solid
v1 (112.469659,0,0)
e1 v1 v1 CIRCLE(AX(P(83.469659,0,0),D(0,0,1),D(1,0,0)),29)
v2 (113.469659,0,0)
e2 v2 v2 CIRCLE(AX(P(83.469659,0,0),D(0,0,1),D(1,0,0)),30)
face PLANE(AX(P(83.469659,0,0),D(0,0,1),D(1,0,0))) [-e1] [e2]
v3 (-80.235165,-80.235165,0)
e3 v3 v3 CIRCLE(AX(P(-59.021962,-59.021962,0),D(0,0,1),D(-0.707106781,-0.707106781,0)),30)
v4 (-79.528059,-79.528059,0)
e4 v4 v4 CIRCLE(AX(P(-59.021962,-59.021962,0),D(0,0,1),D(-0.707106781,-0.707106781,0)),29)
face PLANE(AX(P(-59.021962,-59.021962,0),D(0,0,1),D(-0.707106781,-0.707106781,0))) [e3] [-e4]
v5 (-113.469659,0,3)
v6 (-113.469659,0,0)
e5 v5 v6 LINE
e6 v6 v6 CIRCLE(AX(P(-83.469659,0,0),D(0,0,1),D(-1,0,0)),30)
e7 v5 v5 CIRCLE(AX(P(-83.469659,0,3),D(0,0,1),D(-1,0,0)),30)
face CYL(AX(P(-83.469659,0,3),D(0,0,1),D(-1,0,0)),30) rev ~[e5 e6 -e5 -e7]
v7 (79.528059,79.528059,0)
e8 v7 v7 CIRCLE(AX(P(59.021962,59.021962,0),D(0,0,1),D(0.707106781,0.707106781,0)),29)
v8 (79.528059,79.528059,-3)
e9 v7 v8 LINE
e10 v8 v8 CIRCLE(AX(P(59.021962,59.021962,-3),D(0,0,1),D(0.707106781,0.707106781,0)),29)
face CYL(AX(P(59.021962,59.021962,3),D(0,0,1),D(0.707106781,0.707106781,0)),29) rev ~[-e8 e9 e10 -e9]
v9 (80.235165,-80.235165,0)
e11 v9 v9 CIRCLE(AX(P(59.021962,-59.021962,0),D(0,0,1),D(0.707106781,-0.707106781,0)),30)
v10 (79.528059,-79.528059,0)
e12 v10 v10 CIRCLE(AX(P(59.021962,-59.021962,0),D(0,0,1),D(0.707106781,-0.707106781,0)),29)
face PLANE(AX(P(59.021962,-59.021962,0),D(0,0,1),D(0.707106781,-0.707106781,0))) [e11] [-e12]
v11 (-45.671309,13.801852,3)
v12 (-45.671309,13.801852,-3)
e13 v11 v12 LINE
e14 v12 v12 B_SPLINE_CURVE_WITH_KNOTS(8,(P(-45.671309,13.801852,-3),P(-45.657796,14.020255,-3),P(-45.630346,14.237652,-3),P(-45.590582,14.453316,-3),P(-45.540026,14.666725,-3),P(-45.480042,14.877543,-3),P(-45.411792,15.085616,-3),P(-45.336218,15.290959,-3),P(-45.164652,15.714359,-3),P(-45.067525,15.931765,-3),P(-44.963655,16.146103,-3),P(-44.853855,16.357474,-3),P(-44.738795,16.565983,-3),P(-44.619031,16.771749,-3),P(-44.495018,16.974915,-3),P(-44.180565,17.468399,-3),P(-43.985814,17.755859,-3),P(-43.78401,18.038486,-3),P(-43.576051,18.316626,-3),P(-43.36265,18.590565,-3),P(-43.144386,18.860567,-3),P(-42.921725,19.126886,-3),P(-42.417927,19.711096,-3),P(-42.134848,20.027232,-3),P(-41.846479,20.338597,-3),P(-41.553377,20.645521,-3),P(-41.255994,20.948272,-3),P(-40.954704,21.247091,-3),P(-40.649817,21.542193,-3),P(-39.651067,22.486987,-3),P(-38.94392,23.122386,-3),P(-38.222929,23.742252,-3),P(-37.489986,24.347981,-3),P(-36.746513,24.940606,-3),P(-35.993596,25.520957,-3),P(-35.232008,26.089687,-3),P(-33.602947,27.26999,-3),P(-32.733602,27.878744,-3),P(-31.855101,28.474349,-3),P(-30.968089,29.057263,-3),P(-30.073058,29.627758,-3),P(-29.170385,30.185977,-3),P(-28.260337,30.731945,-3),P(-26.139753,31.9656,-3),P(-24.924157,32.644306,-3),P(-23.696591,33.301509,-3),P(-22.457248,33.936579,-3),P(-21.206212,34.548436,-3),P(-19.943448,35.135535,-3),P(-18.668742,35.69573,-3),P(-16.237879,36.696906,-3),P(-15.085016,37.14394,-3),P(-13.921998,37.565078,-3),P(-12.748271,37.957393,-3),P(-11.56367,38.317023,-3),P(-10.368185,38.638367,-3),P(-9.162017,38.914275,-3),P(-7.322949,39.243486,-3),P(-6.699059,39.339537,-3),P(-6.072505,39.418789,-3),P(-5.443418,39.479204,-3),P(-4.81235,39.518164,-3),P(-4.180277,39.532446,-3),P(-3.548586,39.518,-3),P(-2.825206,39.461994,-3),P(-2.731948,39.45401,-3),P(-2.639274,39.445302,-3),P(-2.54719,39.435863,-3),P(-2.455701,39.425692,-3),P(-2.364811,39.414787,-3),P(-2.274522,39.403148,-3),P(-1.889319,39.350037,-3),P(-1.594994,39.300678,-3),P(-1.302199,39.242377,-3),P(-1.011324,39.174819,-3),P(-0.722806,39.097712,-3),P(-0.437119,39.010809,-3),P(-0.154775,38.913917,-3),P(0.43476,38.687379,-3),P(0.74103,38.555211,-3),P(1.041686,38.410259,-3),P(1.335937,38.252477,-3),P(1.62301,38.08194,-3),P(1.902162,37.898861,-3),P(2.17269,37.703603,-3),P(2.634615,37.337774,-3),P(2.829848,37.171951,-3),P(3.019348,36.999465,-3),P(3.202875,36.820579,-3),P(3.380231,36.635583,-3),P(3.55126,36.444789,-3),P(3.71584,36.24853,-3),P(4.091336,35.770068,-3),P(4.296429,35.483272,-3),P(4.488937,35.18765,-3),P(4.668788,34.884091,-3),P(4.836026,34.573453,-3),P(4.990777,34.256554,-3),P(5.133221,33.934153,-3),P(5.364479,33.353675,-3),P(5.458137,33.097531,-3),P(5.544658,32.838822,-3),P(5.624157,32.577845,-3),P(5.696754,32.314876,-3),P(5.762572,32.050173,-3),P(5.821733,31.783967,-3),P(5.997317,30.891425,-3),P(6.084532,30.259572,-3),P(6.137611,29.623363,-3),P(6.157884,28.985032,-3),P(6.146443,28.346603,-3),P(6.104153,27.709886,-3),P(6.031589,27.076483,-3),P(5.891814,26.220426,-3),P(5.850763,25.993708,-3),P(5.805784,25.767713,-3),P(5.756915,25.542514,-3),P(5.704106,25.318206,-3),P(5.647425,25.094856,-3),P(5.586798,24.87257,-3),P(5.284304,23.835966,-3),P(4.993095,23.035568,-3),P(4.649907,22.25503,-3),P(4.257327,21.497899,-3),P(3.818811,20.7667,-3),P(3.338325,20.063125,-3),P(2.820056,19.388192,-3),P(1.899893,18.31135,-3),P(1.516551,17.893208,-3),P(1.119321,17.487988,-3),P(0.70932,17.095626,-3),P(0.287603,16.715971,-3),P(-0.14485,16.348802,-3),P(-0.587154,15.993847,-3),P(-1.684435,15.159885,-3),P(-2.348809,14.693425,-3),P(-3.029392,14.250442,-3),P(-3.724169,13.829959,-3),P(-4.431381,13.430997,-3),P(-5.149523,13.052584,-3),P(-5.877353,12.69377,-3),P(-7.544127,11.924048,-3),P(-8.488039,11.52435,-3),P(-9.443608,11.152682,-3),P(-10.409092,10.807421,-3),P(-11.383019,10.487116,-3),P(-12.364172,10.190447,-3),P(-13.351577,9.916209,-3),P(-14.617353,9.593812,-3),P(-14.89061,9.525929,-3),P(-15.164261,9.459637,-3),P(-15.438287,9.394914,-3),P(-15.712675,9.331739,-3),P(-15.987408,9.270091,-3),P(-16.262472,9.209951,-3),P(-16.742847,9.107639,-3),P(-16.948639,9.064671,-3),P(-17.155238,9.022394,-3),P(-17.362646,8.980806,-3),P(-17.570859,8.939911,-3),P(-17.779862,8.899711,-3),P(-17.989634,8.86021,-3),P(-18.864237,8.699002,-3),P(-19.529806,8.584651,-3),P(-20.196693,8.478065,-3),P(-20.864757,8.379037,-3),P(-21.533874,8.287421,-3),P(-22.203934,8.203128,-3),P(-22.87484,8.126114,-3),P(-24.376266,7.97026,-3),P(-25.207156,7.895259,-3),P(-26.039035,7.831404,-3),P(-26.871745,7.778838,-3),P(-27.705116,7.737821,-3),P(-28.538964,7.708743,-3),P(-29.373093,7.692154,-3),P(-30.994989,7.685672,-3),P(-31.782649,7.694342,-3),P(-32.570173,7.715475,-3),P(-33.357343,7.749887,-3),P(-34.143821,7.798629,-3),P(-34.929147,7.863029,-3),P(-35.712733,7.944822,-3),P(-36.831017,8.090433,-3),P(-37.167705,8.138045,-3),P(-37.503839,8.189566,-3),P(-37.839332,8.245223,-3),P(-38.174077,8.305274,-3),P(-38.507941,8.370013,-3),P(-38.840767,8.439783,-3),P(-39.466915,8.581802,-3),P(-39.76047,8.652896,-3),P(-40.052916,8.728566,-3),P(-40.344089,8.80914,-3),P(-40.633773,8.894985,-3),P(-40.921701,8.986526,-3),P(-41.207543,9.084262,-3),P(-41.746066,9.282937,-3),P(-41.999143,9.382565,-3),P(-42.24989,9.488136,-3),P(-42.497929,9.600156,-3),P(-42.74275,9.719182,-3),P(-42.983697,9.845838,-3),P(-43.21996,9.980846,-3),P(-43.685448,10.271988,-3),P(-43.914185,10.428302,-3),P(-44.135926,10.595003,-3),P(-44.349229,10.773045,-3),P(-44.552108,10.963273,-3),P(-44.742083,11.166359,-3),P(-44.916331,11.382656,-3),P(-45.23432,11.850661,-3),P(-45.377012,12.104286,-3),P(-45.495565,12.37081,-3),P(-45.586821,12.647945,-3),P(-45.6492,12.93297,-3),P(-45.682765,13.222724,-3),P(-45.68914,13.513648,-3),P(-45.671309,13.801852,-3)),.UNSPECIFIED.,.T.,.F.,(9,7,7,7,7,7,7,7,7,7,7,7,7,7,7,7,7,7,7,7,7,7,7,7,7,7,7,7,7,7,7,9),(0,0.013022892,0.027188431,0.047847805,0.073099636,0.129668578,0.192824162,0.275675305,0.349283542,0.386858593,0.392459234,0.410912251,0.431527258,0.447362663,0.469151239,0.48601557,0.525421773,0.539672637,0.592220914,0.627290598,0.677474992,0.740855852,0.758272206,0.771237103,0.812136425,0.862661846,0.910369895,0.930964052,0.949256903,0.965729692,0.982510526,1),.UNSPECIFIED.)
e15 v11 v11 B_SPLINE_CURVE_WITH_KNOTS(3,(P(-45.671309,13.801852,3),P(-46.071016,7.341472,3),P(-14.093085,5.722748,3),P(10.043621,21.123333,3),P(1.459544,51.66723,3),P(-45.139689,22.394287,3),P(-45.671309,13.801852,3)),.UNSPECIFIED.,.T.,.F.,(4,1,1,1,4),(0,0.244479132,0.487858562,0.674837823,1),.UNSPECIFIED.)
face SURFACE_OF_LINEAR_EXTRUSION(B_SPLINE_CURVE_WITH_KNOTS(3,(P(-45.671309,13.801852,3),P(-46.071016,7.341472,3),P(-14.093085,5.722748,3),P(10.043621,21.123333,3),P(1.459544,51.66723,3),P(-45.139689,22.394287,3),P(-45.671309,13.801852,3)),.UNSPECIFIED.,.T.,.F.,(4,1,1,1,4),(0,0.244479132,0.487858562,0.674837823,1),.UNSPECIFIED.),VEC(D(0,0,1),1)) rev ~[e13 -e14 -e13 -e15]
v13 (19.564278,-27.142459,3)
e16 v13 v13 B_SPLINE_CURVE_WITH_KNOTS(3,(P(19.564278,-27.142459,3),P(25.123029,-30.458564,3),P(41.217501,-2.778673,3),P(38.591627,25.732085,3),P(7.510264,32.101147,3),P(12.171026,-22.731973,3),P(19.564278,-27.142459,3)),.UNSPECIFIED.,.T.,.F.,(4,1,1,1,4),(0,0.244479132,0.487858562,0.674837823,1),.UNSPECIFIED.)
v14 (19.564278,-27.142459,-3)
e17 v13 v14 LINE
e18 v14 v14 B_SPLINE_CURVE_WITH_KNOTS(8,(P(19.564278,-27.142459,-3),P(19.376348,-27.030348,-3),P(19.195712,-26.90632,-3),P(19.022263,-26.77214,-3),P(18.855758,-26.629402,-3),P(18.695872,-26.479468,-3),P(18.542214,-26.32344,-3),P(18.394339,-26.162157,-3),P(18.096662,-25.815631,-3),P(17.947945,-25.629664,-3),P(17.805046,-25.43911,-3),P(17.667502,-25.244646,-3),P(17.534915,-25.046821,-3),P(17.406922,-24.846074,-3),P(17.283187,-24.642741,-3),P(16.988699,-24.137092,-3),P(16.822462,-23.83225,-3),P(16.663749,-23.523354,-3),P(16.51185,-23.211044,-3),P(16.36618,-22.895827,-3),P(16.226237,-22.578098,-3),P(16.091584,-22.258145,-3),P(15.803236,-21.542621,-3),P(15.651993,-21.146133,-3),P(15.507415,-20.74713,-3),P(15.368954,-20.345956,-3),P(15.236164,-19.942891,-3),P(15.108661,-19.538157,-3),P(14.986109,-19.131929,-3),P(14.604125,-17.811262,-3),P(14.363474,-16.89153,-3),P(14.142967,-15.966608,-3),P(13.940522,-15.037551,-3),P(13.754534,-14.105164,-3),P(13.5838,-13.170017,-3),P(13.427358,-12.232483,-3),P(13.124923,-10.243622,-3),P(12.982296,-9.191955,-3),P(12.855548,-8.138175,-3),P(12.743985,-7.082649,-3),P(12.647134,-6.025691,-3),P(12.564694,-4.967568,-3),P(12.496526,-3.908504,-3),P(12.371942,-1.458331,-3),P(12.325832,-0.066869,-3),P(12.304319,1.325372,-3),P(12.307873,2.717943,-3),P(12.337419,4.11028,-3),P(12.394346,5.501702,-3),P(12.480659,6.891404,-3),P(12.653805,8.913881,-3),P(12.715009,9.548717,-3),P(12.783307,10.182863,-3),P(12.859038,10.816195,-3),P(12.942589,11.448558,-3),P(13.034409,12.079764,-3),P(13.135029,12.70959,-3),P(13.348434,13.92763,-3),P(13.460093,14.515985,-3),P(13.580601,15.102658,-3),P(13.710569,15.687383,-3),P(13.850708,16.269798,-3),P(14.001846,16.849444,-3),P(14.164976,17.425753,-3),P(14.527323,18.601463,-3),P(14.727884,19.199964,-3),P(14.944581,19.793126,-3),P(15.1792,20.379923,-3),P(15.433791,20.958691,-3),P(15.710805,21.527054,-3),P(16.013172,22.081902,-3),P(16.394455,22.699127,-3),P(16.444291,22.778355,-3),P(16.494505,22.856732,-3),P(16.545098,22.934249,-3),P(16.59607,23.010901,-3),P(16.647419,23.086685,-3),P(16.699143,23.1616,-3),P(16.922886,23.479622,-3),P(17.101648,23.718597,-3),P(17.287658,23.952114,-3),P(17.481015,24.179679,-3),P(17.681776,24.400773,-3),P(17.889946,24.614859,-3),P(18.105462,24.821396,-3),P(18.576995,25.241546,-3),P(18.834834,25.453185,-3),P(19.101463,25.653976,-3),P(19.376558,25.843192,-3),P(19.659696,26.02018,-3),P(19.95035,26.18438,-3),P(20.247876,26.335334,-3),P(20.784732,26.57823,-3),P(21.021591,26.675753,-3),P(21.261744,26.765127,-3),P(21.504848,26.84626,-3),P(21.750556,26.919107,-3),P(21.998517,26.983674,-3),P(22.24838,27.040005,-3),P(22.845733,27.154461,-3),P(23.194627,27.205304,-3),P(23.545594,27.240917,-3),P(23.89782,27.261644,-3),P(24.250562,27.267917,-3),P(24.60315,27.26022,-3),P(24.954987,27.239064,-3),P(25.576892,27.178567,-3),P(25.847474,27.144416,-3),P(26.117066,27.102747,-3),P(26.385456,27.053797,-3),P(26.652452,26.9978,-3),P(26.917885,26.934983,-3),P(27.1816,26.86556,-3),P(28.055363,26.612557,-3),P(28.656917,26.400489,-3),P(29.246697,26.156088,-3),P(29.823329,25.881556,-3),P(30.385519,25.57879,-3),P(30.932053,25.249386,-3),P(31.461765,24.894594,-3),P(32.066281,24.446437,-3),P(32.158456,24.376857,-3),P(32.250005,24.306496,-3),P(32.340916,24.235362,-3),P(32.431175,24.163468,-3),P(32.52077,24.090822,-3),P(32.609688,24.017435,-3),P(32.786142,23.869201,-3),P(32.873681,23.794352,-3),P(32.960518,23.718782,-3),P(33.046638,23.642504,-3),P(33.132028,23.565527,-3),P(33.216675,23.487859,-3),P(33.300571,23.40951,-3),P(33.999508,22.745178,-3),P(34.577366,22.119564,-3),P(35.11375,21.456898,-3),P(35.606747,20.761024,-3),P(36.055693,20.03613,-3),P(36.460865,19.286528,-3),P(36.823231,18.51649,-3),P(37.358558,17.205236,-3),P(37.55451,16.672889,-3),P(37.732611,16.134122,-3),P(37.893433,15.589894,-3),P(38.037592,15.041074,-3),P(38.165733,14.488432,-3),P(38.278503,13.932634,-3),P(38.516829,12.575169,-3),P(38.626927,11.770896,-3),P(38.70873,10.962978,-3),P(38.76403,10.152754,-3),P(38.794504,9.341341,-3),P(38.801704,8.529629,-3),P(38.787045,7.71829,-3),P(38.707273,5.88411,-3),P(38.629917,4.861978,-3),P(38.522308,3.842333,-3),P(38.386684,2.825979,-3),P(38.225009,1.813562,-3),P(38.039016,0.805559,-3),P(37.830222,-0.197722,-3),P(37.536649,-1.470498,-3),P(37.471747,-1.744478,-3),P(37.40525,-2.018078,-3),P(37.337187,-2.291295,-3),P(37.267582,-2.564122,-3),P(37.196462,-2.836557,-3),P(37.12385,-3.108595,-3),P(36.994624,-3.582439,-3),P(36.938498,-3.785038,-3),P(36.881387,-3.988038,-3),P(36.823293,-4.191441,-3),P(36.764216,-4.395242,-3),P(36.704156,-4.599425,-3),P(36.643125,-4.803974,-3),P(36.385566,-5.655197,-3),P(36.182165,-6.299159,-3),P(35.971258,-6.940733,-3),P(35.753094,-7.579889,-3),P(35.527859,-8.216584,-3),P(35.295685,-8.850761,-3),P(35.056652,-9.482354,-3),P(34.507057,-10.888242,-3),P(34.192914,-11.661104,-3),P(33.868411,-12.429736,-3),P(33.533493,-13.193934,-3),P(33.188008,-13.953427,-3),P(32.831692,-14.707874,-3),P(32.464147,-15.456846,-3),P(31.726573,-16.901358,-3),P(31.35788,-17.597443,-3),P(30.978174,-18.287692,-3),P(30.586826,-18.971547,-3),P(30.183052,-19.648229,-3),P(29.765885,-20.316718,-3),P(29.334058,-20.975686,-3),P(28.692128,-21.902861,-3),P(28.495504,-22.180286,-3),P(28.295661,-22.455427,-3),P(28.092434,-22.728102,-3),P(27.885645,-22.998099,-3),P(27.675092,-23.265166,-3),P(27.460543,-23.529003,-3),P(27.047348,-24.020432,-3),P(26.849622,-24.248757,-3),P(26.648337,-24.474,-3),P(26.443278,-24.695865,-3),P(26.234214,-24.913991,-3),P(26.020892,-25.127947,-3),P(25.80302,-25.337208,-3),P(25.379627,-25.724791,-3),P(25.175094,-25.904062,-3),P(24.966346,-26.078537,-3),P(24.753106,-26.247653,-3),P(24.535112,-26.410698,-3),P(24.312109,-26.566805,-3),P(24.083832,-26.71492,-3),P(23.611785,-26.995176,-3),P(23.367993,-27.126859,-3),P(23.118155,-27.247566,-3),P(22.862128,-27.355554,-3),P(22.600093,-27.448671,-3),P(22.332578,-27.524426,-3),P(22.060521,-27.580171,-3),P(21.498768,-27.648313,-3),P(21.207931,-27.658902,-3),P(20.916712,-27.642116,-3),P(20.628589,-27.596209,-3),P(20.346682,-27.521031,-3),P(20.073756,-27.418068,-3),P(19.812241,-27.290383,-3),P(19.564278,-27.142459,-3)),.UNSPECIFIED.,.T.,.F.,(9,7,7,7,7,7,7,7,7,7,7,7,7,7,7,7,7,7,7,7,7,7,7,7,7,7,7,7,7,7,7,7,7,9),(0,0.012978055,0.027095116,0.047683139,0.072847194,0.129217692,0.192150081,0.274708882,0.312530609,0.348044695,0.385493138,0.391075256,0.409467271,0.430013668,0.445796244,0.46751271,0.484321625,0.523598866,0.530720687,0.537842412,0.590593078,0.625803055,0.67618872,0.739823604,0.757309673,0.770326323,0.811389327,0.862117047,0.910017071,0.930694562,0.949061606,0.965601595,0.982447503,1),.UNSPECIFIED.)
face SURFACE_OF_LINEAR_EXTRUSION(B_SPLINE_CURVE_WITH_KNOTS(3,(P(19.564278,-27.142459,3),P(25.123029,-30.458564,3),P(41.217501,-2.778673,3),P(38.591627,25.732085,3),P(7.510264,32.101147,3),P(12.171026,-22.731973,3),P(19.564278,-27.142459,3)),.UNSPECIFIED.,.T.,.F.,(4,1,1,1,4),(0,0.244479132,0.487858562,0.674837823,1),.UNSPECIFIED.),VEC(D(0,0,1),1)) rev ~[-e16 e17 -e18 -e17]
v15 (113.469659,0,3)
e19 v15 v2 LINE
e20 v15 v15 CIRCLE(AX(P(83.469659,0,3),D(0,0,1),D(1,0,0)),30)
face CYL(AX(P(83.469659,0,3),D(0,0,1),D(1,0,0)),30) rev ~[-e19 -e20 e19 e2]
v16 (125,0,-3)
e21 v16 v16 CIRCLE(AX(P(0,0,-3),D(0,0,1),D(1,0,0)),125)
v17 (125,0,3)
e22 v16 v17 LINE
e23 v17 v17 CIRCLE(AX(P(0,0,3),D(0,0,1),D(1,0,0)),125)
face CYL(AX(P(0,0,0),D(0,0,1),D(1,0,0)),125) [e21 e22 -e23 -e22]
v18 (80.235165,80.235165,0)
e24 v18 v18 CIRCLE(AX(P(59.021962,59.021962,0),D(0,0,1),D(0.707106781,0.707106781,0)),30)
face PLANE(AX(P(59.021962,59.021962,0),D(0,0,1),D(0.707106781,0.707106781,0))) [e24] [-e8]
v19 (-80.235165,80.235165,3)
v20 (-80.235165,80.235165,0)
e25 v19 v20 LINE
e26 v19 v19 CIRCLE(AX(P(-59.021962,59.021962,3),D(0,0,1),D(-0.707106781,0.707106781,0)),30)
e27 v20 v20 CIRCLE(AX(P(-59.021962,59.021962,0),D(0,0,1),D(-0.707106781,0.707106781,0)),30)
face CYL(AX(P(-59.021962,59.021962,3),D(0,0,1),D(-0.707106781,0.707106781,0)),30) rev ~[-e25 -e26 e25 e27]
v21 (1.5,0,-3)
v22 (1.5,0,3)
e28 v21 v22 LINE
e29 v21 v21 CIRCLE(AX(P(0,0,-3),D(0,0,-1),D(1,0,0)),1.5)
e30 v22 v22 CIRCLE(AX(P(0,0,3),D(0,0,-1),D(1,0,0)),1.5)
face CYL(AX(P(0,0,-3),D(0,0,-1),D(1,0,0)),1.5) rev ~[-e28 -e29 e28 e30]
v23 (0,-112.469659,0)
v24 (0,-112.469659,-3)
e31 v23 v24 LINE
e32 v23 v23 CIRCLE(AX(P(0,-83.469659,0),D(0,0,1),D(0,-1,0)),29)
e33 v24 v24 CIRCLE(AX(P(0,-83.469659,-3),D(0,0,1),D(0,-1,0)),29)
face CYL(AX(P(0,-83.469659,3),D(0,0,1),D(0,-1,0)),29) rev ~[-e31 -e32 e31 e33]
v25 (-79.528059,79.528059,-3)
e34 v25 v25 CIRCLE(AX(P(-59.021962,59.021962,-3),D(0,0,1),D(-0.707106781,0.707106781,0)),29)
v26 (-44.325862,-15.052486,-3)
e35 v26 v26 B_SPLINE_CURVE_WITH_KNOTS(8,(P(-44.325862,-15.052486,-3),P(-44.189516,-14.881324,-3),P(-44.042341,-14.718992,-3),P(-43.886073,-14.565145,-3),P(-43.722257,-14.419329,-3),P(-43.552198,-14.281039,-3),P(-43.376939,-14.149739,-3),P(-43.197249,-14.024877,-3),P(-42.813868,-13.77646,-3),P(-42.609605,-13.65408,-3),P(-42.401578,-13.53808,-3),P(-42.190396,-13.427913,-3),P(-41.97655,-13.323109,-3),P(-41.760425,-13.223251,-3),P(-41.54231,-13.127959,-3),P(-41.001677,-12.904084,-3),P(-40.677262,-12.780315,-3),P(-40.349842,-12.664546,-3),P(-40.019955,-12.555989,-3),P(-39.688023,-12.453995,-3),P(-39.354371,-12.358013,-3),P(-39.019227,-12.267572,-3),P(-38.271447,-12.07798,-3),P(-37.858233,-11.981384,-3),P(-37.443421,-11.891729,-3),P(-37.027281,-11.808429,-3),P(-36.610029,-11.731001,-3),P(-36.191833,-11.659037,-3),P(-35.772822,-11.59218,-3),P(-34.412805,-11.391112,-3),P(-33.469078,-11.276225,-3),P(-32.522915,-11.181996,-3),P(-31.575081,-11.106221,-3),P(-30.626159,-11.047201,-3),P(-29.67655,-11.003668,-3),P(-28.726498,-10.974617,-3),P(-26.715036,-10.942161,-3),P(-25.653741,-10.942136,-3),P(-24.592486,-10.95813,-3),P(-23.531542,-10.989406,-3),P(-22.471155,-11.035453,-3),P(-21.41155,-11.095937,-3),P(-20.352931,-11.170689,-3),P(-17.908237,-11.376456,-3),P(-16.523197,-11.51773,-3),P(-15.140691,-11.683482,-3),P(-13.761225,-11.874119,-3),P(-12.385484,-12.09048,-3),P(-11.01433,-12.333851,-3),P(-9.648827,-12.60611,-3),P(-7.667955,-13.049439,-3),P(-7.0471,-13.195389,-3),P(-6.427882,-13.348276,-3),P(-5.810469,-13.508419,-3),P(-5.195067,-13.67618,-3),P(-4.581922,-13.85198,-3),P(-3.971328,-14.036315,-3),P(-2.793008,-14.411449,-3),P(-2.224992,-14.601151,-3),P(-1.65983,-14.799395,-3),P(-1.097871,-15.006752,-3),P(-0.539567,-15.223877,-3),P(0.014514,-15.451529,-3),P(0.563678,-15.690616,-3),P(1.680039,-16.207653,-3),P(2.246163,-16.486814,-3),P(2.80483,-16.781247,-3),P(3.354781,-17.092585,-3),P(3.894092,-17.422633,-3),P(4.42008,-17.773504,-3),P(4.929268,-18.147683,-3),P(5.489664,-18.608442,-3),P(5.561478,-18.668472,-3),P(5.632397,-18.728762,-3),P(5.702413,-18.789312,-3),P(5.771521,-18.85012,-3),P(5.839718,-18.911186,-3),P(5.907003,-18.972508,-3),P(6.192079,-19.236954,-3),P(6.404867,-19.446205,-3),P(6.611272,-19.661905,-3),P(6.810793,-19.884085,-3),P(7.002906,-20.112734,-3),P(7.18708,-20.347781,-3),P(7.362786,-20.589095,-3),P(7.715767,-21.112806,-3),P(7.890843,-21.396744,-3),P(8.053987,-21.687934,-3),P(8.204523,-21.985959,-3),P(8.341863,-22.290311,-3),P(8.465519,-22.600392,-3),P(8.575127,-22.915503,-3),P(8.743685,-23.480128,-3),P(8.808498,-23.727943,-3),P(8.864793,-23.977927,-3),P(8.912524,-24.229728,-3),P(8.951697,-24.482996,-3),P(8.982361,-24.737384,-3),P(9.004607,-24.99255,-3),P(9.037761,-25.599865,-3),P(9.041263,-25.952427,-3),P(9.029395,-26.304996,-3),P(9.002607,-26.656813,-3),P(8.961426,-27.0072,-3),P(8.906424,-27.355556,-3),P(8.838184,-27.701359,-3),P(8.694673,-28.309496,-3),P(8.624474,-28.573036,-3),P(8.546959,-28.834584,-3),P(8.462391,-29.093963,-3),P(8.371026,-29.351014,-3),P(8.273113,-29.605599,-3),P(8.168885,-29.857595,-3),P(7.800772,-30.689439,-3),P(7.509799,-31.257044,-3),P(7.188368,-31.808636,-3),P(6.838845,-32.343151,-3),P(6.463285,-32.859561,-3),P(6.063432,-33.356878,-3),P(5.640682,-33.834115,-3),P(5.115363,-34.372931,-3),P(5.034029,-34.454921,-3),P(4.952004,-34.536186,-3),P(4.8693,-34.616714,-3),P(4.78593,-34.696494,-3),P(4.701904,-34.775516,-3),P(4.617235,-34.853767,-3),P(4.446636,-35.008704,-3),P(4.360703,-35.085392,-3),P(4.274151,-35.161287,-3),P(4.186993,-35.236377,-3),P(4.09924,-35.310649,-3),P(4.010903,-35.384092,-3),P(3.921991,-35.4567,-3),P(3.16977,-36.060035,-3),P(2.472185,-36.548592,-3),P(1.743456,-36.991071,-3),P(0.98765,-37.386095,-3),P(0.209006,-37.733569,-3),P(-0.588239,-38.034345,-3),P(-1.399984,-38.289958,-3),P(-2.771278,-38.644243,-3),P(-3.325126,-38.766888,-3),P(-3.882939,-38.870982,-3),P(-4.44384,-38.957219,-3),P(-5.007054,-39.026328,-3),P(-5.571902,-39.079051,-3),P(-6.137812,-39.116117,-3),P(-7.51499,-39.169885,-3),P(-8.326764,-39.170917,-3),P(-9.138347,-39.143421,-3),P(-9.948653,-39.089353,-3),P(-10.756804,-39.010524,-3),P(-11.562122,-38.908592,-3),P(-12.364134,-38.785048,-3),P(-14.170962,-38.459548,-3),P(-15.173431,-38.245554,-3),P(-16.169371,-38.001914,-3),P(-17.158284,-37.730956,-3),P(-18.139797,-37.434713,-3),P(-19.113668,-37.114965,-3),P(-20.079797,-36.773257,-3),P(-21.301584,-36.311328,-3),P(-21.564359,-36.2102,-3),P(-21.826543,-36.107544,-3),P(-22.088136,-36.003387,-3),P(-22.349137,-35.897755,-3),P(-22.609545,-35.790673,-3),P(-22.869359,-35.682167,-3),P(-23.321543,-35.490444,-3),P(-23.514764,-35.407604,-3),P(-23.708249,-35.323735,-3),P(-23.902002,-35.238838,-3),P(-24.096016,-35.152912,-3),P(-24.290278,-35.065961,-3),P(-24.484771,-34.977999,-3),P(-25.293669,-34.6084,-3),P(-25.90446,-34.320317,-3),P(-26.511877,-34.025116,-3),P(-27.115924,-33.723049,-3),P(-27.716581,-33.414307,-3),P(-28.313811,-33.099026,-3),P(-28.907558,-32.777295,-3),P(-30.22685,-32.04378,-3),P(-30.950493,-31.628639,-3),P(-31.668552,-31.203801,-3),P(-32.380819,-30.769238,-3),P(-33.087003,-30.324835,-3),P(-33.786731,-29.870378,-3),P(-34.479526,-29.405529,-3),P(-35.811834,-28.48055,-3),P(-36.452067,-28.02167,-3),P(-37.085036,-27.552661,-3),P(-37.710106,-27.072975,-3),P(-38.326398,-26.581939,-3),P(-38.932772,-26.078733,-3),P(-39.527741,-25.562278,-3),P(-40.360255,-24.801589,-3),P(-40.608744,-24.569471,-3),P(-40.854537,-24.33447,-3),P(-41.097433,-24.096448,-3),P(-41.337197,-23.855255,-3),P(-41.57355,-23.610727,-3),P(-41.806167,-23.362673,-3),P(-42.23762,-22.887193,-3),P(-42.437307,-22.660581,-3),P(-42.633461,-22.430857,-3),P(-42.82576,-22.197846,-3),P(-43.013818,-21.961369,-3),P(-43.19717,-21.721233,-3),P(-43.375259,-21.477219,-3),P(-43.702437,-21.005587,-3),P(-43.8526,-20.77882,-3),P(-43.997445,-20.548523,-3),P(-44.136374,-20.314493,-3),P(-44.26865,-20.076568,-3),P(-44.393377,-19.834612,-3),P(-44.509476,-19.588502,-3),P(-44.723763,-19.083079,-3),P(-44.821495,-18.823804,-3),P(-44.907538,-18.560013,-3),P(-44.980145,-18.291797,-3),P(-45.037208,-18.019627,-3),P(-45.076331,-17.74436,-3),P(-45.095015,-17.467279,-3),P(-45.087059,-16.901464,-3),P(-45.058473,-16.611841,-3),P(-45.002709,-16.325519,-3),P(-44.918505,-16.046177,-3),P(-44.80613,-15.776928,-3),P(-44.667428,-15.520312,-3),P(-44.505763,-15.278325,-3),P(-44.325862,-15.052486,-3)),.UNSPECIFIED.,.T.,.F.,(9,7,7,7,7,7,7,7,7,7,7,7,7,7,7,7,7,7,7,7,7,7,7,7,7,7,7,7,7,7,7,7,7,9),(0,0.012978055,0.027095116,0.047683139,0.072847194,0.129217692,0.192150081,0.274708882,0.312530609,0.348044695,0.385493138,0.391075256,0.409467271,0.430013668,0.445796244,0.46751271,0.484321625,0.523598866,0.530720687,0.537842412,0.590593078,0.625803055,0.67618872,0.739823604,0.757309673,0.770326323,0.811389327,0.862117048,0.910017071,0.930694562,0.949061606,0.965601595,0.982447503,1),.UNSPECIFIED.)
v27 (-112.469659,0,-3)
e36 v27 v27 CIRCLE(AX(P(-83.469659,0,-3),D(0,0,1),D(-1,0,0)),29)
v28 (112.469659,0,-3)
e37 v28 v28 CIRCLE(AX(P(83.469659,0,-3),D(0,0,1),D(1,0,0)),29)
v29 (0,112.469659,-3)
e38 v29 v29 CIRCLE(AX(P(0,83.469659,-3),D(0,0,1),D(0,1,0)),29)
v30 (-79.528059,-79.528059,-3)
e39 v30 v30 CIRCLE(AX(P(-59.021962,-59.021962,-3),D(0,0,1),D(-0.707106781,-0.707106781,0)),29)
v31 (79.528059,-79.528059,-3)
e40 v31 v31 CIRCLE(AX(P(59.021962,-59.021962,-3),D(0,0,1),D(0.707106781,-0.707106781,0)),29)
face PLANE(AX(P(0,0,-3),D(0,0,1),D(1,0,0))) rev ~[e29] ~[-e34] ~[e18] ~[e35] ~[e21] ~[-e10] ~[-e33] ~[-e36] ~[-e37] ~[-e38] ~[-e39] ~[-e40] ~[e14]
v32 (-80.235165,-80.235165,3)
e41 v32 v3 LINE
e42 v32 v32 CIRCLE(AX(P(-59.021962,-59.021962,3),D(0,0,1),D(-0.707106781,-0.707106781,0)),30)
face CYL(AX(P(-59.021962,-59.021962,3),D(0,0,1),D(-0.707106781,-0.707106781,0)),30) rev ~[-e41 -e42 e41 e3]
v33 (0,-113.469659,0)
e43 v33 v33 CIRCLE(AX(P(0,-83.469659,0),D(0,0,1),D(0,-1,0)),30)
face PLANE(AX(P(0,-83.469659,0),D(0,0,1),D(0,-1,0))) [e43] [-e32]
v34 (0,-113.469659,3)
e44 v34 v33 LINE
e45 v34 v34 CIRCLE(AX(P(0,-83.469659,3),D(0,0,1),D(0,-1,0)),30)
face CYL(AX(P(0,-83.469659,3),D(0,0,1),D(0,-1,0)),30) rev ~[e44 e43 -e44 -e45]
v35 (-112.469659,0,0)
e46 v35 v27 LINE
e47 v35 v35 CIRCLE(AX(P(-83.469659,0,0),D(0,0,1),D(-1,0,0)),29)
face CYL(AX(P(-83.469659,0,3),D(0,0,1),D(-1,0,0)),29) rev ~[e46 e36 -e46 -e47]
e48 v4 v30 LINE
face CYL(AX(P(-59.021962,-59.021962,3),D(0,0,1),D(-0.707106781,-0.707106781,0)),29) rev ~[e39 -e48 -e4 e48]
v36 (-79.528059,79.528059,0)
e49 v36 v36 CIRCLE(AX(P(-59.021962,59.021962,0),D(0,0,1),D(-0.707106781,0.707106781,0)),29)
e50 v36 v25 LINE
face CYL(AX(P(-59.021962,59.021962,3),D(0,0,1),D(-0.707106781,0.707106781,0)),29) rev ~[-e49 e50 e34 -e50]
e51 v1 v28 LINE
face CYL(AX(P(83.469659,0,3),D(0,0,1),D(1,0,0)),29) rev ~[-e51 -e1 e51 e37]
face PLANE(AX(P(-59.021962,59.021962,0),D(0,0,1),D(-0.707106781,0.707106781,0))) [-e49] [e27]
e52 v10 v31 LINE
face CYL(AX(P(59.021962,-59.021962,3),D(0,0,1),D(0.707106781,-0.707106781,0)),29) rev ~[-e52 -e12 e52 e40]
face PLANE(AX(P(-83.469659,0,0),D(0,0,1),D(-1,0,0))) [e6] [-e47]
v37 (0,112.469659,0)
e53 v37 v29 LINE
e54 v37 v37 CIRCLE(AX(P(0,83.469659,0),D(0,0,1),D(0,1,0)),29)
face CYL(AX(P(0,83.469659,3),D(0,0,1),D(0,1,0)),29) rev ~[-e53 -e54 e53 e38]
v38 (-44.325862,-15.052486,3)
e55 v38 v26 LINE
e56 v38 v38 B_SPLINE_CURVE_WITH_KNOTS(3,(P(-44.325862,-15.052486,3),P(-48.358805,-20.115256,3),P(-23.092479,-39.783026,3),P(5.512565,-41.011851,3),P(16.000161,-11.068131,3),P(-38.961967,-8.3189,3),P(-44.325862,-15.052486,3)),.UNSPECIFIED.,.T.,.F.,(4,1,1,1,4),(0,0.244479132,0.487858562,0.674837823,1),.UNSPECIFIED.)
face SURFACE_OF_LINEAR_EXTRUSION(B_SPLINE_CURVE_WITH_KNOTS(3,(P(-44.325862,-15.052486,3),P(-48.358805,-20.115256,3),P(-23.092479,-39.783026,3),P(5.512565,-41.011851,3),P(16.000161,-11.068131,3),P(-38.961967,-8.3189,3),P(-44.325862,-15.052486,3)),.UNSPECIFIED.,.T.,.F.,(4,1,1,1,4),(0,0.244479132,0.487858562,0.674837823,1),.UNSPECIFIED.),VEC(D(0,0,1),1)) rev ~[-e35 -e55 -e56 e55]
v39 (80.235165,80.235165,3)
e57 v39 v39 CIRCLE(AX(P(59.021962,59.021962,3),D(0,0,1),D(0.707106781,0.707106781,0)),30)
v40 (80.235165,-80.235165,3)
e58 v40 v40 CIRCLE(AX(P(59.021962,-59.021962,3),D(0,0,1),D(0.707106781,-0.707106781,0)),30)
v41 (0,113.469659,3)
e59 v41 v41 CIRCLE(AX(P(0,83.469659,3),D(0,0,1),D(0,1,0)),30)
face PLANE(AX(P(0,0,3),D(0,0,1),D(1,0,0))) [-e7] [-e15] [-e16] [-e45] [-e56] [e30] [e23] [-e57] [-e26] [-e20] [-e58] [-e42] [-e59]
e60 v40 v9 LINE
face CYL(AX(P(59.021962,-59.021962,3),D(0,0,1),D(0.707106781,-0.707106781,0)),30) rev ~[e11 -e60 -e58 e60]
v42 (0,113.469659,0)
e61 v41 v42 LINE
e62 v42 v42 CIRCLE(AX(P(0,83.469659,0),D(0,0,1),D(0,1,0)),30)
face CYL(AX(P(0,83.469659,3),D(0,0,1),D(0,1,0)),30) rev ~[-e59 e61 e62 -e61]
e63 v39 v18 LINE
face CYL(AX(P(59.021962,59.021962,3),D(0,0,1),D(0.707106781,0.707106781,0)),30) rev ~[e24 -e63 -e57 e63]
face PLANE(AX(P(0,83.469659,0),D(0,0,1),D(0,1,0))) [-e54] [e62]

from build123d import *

# Parameters (mm, degrees)
F0_R            = 125
F1_DEPTH        = 3
F2_R            = 1.5
F3_DEPTH        = 6.001
F5_R            = 29
F6_DEPTH        = 6.001
F6_COPIES_COUNT = 8
F5_R_2          = 30
F7_DEPTH        = 3
F7_COPIES_COUNT = 8
F9_DEPTH        = 6.001


# Not quite as in the source:
# - a pattern or mirror of a feature is missing from the dataset's text; its kind, count and spacing are read off the source's solid


with BuildPart() as f1:
    # F0 (on Top) → F1 (new body, symmetric)
    with BuildSketch(Plane.XY):
        Circle(F0_R)
    extrude(amount=F1_DEPTH, both=True)

    # F2 (on face) → F3 (cut, through all)
    with BuildSketch(Plane(origin=(0, 0, -3), x_dir=(1, 0, 0), z_dir=(0, 0, -1))):
        Circle(F2_R)
    extrude(amount=-F3_DEPTH, mode=Mode.SUBTRACT)

    # F5 (on face) → F6 (cut, through all)
    with BuildSketch(Plane.XY.offset(3)):
        with Locations((83.46965909, 0)):
            Circle(F5_R)
    f6 = extrude(amount=-F6_DEPTH, mode=Mode.SUBTRACT)

    # F6_copies: F6 ×8 about axis
    f6_copies_axis = Axis((0, 0, 0), (0, 0, 1))
    for i in range(1, F6_COPIES_COUNT):
        add(f6.rotate(f6_copies_axis, i * 360 / F6_COPIES_COUNT), mode=Mode.SUBTRACT)

    # F5 (on face) → F7 (cut)
    with BuildSketch(Plane.XY.offset(3)):
        with Locations((83.46965909, 0)):
            Circle(F5_R_2)
        with Locations((83.46965909, 0)):
            Circle(F5_R, mode=Mode.SUBTRACT)
    f7 = extrude(amount=-F7_DEPTH, mode=Mode.SUBTRACT)

    # F7_copies: F7 ×8 about axis
    f7_copies_axis = Axis((0, 0, 0), (0, 0, 1))
    for i in range(1, F7_COPIES_COUNT):
        add(f7.rotate(f7_copies_axis, i * 360 / F7_COPIES_COUNT), mode=Mode.SUBTRACT)

    # F8 (on face) → F9 (cut, through all)
    with BuildSketch(Plane.XY.offset(3)):
        with BuildLine():
            add(Edge.make_bspline(
                [(-44.3258620799, -15.0524862111), (-48.3588050122, -20.1152564211), (-23.0924792953, -39.7830257512), (5.512565217, -41.0118510348), (16.0001607542, -11.0681310793), (-38.9619666275, -8.3188997057), (-44.3258620799, -15.0524862111)],
                knots=[0, 0, 0, 0, 0.2444791319, 0.4878585615, 0.6748378229, 1, 1, 1, 1], degree=3))
        make_face()
        with BuildLine():
            add(Edge.make_bspline(
                [(-45.671308504, 13.8018518265), (-46.0710162563, 7.3414722241), (-14.0930848504, 5.7227478351), (10.0436210659, 21.123332585), (1.4595442067, 51.6672296743), (-45.1396891305, 22.3942870163), (-45.671308504, 13.8018518265)],
                knots=[0, 0, 0, 0, 0.2444791319, 0.4878585615, 0.6748378229, 1, 1, 1, 1], degree=3))
        make_face()
        with BuildLine():
            add(Edge.make_bspline(
                [(19.5642778018, -27.1424591751), (25.1230293593, -30.4585641219), (41.2175010078, -2.7786734428), (38.591626534, 25.7320853401), (7.5102643018, 32.1011470227), (12.1710260995, -22.7319727037), (19.5642778018, -27.1424591751)],
                knots=[0, 0, 0, 0, 0.2444791319, 0.4878585615, 0.6748378229, 1, 1, 1, 1], degree=3))
        make_face()
    extrude(amount=-F9_DEPTH, mode=Mode.SUBTRACT)


solid = f1.part
